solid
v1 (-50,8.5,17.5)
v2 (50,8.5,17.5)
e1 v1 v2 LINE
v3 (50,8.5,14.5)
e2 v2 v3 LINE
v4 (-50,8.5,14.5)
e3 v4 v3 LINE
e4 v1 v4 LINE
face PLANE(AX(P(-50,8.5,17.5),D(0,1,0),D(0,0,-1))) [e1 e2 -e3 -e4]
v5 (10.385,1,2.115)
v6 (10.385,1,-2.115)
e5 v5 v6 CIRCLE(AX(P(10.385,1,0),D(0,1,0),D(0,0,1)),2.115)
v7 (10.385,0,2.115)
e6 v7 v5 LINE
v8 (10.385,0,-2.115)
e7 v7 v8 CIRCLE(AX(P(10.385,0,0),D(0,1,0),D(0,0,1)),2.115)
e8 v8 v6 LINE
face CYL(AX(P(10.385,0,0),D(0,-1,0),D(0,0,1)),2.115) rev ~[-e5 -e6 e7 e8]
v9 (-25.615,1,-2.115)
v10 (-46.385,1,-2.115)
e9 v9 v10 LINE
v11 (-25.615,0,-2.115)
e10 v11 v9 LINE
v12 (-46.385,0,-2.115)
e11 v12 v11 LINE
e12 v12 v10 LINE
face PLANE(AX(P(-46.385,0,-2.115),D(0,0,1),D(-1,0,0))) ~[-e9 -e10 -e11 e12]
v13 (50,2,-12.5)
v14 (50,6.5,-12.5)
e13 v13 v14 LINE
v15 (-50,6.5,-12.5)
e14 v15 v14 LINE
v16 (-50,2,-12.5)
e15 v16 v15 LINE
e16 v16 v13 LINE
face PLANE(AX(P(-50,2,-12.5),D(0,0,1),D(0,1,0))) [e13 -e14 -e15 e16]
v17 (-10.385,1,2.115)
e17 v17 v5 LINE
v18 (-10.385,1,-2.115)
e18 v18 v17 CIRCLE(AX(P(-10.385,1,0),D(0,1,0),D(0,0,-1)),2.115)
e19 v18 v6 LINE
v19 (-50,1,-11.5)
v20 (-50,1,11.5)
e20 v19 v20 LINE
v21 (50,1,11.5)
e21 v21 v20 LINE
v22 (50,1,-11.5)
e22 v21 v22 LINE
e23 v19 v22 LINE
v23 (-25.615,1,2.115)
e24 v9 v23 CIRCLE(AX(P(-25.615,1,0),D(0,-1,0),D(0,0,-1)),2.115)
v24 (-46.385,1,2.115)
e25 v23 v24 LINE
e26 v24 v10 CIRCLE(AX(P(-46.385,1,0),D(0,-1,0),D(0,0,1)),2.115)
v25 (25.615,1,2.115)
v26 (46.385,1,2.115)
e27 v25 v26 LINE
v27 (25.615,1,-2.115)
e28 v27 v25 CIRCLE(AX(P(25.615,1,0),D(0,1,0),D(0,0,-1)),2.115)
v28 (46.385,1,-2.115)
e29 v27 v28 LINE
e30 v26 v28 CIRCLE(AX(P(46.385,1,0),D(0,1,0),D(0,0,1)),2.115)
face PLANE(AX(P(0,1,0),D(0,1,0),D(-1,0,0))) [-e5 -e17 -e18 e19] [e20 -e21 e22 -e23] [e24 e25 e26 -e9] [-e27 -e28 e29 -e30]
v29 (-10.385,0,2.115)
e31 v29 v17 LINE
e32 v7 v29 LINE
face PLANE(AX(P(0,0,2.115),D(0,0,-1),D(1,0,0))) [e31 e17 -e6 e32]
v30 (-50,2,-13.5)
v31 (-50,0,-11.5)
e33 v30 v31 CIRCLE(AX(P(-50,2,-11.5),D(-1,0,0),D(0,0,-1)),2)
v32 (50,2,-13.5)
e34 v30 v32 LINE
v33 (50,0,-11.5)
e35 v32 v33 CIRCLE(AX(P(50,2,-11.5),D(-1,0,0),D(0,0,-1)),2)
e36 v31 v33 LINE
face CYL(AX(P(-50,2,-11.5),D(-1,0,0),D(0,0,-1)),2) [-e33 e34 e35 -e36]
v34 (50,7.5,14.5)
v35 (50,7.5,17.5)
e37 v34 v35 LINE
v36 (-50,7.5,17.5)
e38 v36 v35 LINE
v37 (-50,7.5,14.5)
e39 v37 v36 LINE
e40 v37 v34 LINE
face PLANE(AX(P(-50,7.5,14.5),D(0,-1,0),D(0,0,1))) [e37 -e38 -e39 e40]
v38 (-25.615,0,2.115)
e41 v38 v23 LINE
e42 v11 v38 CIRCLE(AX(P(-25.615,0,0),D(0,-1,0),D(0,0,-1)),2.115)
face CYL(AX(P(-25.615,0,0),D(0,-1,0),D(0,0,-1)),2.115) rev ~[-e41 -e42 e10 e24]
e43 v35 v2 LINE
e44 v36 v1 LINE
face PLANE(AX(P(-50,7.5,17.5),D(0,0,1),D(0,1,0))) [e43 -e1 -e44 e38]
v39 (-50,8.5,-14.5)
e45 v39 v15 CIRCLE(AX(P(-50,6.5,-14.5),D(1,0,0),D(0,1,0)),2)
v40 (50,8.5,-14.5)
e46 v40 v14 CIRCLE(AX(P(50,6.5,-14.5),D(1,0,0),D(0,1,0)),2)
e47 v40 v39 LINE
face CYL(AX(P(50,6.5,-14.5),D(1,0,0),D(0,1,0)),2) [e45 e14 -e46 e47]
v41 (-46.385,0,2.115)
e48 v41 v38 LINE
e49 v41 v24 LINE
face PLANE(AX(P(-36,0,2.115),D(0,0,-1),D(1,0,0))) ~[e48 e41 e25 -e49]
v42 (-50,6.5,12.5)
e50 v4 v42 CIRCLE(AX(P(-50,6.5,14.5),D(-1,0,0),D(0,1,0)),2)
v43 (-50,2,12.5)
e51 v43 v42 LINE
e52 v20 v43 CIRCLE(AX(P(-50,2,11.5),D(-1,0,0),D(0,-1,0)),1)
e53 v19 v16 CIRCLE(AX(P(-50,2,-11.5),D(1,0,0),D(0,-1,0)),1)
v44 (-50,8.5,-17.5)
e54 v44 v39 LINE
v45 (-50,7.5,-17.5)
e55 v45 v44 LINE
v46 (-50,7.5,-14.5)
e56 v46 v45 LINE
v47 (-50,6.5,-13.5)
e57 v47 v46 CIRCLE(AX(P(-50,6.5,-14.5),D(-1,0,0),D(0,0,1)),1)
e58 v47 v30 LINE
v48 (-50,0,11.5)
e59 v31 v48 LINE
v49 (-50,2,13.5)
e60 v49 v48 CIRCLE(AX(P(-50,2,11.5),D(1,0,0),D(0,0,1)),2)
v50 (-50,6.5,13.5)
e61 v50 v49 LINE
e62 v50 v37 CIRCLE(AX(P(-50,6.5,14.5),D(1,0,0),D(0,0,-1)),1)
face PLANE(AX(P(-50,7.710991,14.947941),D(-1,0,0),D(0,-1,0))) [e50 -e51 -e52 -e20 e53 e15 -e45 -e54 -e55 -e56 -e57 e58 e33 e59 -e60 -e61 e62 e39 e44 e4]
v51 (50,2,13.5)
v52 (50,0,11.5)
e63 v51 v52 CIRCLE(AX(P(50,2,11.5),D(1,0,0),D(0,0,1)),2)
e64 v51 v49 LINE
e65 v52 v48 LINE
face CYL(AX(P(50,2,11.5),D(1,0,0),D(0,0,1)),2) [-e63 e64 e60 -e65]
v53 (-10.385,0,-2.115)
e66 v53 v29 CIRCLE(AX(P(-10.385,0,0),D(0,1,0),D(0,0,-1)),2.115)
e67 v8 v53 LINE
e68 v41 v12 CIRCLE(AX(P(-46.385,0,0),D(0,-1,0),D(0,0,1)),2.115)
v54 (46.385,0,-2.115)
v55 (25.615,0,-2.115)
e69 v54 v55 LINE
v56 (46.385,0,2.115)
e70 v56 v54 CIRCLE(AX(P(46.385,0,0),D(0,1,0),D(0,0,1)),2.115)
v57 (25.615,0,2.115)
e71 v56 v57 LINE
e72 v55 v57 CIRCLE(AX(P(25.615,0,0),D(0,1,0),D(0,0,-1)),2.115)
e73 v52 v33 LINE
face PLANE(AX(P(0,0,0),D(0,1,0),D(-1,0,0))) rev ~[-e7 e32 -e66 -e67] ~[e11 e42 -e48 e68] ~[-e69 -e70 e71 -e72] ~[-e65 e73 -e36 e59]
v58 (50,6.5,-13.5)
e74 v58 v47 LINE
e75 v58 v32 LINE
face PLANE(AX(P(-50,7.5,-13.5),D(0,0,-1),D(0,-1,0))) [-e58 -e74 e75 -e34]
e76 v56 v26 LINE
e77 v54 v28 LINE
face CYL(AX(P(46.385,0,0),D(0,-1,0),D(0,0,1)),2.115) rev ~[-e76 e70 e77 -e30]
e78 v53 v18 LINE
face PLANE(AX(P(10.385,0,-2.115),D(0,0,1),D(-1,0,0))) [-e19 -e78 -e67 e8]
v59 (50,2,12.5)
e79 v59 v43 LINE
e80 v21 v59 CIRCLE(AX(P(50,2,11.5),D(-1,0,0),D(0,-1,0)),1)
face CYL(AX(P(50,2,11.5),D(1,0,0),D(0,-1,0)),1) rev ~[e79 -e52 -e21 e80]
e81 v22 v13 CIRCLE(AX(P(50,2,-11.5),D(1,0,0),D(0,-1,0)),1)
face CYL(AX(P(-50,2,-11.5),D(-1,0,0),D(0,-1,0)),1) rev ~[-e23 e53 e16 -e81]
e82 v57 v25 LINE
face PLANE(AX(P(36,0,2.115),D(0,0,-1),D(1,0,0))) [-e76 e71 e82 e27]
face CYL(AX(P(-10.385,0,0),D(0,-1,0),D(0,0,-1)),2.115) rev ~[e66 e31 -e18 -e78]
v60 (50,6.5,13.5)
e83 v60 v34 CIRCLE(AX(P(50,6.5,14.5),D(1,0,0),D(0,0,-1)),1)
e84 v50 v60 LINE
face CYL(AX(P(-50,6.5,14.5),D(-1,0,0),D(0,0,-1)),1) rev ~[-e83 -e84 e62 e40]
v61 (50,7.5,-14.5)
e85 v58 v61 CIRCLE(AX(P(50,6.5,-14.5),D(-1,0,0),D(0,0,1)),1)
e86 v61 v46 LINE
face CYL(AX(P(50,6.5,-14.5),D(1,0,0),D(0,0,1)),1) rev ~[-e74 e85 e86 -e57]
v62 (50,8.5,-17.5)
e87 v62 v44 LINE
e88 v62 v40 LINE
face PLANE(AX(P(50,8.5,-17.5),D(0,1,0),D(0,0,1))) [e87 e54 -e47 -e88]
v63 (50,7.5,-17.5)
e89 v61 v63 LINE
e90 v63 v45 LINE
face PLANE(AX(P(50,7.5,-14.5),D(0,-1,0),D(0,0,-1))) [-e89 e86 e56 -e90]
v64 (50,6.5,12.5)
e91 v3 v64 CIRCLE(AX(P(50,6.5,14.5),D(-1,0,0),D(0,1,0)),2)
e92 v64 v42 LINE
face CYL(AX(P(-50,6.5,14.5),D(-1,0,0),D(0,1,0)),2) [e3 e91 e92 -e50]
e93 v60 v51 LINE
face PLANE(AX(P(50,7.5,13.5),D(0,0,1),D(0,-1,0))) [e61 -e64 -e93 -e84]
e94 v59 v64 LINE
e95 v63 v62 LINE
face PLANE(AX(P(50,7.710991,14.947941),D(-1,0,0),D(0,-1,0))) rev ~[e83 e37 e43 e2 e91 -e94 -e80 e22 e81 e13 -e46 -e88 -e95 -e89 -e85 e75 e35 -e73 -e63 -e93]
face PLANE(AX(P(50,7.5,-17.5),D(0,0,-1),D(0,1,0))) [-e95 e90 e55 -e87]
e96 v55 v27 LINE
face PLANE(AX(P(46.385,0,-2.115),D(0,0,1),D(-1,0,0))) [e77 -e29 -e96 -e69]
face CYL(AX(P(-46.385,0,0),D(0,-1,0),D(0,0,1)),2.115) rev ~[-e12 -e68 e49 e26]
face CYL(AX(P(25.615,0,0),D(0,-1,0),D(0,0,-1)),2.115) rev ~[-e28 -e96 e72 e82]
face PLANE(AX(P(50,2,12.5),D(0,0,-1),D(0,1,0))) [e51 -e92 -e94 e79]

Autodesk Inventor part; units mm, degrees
ref_plane "YZ Plane" through (0, 0, 0) normal (1, 0, 0) x (0, 1, 0)
ref_plane "XZ Plane" through (0, 0, 0) normal (0, 1, 0) x (-1, 0, 0)
ref_plane "XY Plane" through (0, 0, 0) normal (0, 0, 1) x (1, 0, 0)
sketch "Base Pattern" plane through (0, 0, 0) normal (0, 1, 0) x (-1, 0, 0)
  line L0 (50, 13.5) -> (-50, 13.5)
  line L1 (-50, 13.5) -> (-50, -13.5)
  line L2 (-50, -13.5) -> (50, -13.5)
  line L3 (50, -13.5) -> (50, 13.5)
  line L4 (50, 13.5) -> (-50, -13.5) construction
  line L5 (-50, 13.5) -> (50, -13.5) construction
  point P0 (0, 0)
  dimension "Length" = 100
  dimension "Base_Width" = 27
sketch "Slot Pattern Set-Out" plane through (0, 0, 0) normal (0, 1, 0) x (-1, 0, 0)
  line L0 (0, -25) -> (0, 25)
  line L1 (10.385, 2.115) -> (-10.385, 2.115)
  line L2 (-10.385, -2.115) -> (10.385, -2.115)
  arc A0 (10.385, -2.115) -> (10.385, 2.115) centre (10.385, 0) ccw
  arc A1 (-10.385, 2.115) -> (-10.385, -2.115) centre (-10.385, 0) ccw
  line L3 (32, 0) -> (-32, 0) construction
  line L4 (10.385, 0) -> (-10.385, 0) construction
  point P0 (0, 0)
  point P1 (0, 0)
  point P2 (0, 0)
  point P3 (0, 0)
  dimension "Slot_Length" = 20.77
  dimension "Slot_Dia" = 4.23
  dimension "Pattern_Length" = 64
extrude "Plate1" add sketch "Base Pattern" along normal blind 1
sketch "Sketch3" plane through (-50, 0, -12.5) normal (0, 0, -1) x (-1, 0, 0)
  line L0 (-100, 0) -> (0, 0)
  line L1 (0, 0) -> (0, 7.5)
  line L2 (0, 7.5) -> (-100, 7.5)
  line L3 (-100, 7.5) -> (-100, 0)
edge flange "Flange Side" height 7.5 angle 90 thickness 1 bend radius 1 thickness toward (0, 0, -1) relief tear relief width 1 relief depth 0.5 corner gap 1 corner form 0 edges at (0, 1, -13.5) (0, 1, 13.5) wall of the first edge with corners at (50, 0, -12.5) (-50, 0, -12.5) (-50, 7.5, -12.5) (50, 7.5, -12.5)
bend "Bend1"
corner "Corner1"
sketch "Sketch4" plane through (-50, 7.5, 13.5) normal (0, 1, 0) x (-1, 0, 0)
  line L0 (-100, 0) -> (0, 0)
  line L1 (0, 0) -> (0, 4)
  line L2 (0, 4) -> (-100, 4)
  line L3 (-100, 4) -> (-100, 0)
edge flange "Flange Nib" height 5 angle 90 thickness 1 bend radius 1 thickness toward (0, 1, 0) relief tear relief width 1 relief depth 0.5 corner gap 1 corner form 0 edges at (0, 7.5, 13.5) (0, 7.5, -13.5) wall of the first edge with corners at (50, 7.5, 13.5) (-50, 7.5, 13.5) (-50, 7.5, 17.5) (50, 7.5, 17.5)
bend "Bend2"
corner "Corner2"
extrude "Slot Cut-Out" cut sketch "Slot Pattern Set-Out" along normal blind 1
pattern_linear "Slot Pattern" count 2 spacing 36 along (1, 0, 0) of "Slot Cut-Out"
mirror "Slot Patern Mirror" about plane through (0, 0, 0) normal (1, 0, 0) of "Slot Cut-Out", "Slot Pattern"
equation "\"Slot_Length\" = Slot_Length_Effective"
equation "\"d28\" = Thickness"
equation "\"d30\" = 0.6 * Slots_Integer"
equation "\"d32\" = Slot_Spacing"
equation "\"d33\" = Thickness"
equation "\"d8\" = BendReliefWidth"
equation "\"d9\" = BendReliefDepth"
equation "\"d10\" = MinimumRemnant"
equation "\"d11\" = BendRadius"
equation "\"d12\" = Flange_Height"
equation "\"d14\" = BendRadius"
equation "\"d15\" = CornerReliefSize"
equation "\"d16\" = GapSize"
equation "\"d17\" = JacobiRadiusSize"
equation "\"d18\" = BendReliefWidth"
equation "\"d19\" = BendReliefDepth"
equation "\"d20\" = MinimumRemnant"
equation "\"d21\" = BendRadius"
equation "\"d22\" = Flange_Nib"
equation "\"d24\" = BendRadius"
equation "\"d25\" = CornerReliefSize"
equation "\"d26\" = GapSize"
equation "\"d27\" = JacobiRadiusSize"
equation "\"BendRadius\" = Thickness"
equation "\"BendReliefWidth\" = Thickness"
equation "\"BendReliefDepth\" = 0.5 * Thickness"
equation "\"CornerReliefSize\" = 4 * Thickness"
equation "\"MinimumRemnant\" = 2 * Thickness"
equation "\"TransitionRadius\" = BendRadius"
equation "\"JacobiRadiusSize\" = BendRadius"
equation "\"GapSize\" = Thickness"
equation "\"Flange_Height\" = 7.5"
equation "\"Slot_Spacing\" = 36"
equation "\"Flange_Nib\" = 5"
equation "\"Slot_Length_Tab\" = 25"
equation "\"Slot_Length_Effective\" = Slot_Length_Tab - Slot_Dia"
equation "\"Thickness\" = 1"
equation "\"Slots_Integer\" = 2.777778"
properties part number "DIN Rail (TS) 35mm Wide v1-01" material "Steel"
